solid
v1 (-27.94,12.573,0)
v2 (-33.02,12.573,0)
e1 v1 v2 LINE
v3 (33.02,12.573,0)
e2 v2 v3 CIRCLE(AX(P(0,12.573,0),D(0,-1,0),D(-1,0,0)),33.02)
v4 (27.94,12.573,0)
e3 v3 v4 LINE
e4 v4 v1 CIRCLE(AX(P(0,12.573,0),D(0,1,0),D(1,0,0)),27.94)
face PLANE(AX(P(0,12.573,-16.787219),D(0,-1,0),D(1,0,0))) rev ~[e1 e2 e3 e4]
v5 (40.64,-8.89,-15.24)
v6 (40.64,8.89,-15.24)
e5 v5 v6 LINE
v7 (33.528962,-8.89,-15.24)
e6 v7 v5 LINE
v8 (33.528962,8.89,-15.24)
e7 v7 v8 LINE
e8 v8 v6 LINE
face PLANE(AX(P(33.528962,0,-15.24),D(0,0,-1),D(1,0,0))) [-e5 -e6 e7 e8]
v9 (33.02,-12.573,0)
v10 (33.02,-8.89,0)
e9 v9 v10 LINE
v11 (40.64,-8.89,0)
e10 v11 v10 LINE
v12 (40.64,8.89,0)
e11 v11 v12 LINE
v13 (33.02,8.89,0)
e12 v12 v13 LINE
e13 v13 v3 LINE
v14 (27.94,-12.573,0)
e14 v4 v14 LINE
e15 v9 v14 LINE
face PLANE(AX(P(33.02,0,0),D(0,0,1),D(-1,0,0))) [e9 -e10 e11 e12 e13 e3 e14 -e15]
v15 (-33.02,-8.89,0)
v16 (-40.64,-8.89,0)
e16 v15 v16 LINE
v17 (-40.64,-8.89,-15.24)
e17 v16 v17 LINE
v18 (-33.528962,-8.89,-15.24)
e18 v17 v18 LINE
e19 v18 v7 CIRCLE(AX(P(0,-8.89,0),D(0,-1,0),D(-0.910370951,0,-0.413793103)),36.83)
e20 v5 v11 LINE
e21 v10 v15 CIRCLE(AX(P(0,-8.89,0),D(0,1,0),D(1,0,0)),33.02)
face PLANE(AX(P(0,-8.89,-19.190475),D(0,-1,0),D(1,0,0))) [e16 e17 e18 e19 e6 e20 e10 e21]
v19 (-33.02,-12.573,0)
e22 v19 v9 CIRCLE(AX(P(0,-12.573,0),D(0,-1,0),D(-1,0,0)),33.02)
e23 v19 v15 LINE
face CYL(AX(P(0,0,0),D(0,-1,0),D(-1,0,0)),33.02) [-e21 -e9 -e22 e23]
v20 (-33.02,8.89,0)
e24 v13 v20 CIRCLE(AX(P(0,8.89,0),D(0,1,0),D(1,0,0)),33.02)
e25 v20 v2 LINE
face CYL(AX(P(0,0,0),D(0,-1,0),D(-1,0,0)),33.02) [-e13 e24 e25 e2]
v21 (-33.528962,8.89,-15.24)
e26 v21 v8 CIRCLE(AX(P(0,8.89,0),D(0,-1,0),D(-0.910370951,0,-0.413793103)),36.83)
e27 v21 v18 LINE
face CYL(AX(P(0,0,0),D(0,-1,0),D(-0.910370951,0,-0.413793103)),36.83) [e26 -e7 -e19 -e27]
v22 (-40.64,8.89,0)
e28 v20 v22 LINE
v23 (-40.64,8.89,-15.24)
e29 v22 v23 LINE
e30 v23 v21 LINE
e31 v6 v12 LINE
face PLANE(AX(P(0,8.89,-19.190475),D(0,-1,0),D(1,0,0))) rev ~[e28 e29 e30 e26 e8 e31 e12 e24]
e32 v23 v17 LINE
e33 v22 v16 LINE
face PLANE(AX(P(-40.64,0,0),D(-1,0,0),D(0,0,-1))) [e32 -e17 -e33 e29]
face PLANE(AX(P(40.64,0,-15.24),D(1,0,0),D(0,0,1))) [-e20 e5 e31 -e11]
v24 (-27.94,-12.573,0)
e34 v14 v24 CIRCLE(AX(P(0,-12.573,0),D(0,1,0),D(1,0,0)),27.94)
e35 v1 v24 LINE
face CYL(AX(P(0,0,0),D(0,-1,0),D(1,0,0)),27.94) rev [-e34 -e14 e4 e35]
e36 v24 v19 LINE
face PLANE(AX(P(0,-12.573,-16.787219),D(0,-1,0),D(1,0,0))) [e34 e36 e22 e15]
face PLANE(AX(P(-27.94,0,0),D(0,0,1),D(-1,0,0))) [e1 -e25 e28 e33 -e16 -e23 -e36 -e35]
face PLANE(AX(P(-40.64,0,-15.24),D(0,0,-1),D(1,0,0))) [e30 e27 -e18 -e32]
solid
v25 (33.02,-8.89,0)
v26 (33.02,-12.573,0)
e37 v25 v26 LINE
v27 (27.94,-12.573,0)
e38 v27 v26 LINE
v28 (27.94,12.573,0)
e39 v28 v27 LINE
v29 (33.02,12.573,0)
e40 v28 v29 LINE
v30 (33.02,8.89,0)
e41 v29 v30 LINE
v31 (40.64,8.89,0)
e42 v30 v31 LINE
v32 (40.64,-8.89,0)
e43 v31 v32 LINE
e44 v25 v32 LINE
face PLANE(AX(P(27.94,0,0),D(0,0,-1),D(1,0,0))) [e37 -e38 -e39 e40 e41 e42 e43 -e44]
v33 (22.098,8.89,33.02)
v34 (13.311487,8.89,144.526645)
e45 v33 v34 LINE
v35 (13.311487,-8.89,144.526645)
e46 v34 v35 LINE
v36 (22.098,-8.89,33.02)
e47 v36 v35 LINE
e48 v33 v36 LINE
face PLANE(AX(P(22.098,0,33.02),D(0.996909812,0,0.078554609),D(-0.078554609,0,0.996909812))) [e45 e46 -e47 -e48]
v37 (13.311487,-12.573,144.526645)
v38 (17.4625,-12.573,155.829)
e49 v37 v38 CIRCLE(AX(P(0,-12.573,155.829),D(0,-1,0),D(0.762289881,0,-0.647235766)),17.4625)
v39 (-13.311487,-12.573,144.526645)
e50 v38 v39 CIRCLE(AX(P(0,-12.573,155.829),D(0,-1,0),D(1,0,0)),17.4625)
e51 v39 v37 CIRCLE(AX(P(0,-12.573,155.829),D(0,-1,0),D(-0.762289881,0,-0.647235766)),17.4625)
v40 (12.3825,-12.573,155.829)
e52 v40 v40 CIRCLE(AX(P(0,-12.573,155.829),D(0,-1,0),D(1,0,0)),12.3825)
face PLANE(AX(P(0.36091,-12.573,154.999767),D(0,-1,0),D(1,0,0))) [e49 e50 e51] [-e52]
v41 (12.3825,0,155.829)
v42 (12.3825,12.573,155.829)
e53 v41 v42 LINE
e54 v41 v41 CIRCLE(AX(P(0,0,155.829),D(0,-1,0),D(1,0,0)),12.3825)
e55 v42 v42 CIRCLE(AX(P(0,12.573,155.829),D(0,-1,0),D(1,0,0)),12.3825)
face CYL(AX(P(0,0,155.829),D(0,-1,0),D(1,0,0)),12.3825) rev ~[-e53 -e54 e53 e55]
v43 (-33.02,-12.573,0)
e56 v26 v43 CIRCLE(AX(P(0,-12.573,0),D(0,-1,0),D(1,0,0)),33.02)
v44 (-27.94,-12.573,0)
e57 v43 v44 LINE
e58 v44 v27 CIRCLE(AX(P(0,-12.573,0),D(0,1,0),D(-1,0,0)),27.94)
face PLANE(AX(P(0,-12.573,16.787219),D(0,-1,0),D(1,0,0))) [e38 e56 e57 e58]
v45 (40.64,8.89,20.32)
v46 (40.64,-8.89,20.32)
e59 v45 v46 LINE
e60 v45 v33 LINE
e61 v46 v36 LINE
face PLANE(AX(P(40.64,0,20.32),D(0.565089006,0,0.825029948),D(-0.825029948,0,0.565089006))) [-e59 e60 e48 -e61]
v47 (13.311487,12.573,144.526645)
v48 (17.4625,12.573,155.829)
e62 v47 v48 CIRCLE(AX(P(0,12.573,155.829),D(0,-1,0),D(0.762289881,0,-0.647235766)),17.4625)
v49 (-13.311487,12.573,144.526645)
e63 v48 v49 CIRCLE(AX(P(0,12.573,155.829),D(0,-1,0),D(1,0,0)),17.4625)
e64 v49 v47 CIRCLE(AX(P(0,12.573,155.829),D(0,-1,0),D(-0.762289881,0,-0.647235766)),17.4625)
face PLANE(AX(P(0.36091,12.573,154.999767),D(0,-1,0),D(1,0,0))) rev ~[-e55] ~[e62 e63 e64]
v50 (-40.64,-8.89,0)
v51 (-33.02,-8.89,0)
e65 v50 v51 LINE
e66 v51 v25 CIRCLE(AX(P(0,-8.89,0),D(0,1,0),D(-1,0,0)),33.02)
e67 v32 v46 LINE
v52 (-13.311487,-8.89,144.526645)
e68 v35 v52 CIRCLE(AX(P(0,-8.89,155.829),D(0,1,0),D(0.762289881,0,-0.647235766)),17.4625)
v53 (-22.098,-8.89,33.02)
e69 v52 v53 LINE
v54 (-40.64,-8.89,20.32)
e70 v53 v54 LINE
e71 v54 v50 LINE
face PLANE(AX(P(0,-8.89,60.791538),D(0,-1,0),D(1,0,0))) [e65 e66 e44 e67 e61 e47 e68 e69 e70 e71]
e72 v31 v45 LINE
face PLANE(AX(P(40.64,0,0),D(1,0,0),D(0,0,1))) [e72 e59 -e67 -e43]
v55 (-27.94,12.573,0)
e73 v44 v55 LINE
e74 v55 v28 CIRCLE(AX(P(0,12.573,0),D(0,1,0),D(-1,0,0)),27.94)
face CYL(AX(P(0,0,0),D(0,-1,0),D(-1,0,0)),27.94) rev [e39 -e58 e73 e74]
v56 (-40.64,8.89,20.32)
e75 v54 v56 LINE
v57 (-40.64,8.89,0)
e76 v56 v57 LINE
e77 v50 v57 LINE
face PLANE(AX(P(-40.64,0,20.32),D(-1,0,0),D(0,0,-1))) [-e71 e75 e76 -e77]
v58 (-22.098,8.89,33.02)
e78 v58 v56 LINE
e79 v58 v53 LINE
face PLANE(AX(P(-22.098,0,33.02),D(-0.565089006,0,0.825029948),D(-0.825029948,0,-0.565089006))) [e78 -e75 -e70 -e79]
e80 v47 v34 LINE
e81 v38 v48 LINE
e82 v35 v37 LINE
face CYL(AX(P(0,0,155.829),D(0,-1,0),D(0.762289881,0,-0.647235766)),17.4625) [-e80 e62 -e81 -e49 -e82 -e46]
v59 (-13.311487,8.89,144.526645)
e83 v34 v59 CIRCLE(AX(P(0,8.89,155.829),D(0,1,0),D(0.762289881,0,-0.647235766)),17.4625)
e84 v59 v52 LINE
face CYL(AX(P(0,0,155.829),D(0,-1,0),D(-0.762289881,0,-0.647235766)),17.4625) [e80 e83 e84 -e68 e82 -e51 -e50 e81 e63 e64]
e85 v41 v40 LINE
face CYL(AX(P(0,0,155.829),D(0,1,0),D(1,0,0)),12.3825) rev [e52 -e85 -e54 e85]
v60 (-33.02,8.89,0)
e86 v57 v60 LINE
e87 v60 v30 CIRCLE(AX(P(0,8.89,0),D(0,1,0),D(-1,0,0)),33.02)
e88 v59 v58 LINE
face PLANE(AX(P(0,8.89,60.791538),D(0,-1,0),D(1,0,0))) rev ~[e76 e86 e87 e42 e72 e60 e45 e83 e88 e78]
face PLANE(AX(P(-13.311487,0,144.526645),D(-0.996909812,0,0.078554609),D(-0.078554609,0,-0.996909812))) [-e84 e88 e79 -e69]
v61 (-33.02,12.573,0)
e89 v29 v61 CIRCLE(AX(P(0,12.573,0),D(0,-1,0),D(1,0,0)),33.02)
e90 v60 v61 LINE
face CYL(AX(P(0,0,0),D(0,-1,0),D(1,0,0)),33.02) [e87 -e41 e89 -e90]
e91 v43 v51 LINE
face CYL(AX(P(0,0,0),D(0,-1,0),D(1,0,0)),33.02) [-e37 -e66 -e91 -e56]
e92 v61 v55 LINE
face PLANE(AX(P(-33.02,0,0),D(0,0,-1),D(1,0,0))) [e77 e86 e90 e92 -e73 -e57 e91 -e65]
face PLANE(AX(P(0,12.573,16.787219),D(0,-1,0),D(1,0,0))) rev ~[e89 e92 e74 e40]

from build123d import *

# Parameters (mm, degrees)
F1_DEPTH = 12.573
F2_DEPTH = 8.89
F0_R     = 12.3825
F3_DEPTH = 12.573
F4_DEPTH = 12.573
F5_DEPTH = 8.89


with BuildPart() as f1:
    # F0 (on Front) → F1 (new body, symmetric)
    with BuildSketch(Plane.XZ):
        with BuildLine():
            ThreePointArc((-27.94, 0), (0, 27.94), (27.94, 0))
            Line((27.94, 0), (33.02, 0))
            ThreePointArc((33.02, 0), (0, 33.02), (-33.02, 0))
            Line((-33.02, 0), (-27.94, 0))
        make_face()
    extrude(amount=F1_DEPTH, both=True)

    # F0 (on Front) → F2 (join, symmetric)
    with BuildSketch(Plane.XZ):
        with BuildLine():
            ThreePointArc((-33.02, 0), (0, 33.02), (33.02, 0))
            Line((33.02, 0), (40.64, 0))
            Line((40.64, 0), (40.64, 20.32))
            Line((40.64, 20.32), (22.098, 33.02))
            Line((22.098, 33.02), (13.3114870458, 144.5266454276))
            ThreePointArc((13.3114870458, 144.5266454276), (0, 138.3665), (-13.3114870458, 144.5266454276))
            Line((-13.3114870458, 144.5266454276), (-22.098, 33.02))
            Line((-22.098, 33.02), (-40.64, 20.32))
            Line((-40.64, 20.32), (-40.64, 0))
            Line((-40.64, 0), (-33.02, 0))
        make_face()
    extrude(amount=F2_DEPTH, both=True)

    # F0 (on Front) → F3 (join, symmetric)
    with BuildSketch(Plane.XZ):
        with BuildLine():
            ThreePointArc((-13.3114870458, 144.5266454276), (0, 138.3665), (13.3114870458, 144.5266454276))
            ThreePointArc((13.3114870458, 144.5266454276), (16.3919301607, 149.8087398847), (17.4625, 155.829))
            ThreePointArc((17.4625, 155.829), (-6.0202601153, 172.2209301607), (-13.3114870458, 144.5266454276))
        make_face()
        with Locations((0, 155.829)):
            Circle(F0_R, mode=Mode.SUBTRACT)
    extrude(amount=F3_DEPTH, both=True)


with BuildPart() as f4:
    # F0 (on Front) → F4 (new body, symmetric)
    with BuildSketch(Plane.XZ):
        with BuildLine():
            Line((33.02, 0), (27.94, 0))
            ThreePointArc((27.94, 0), (0, -27.94), (-27.94, 0))
            Line((-27.94, 0), (-33.02, 0))
            ThreePointArc((-33.02, 0), (0, -33.02), (33.02, 0))
        make_face()
    extrude(amount=F4_DEPTH, both=True)

    # F0 (on Front) → F5 (join, symmetric)
    with BuildSketch(Plane.XZ):
        with BuildLine():
            Line((40.64, 0), (33.02, 0))
            ThreePointArc((33.02, 0), (0, -33.02), (-33.02, 0))
            Line((-33.02, 0), (-40.64, 0))
            Line((-40.64, 0), (-40.64, -15.24))
            Line((-40.64, -15.24), (-33.5289621074, -15.24))
            ThreePointArc((-33.5289621074, -15.24), (0, -36.83), (33.5289621074, -15.24))
            Line((33.5289621074, -15.24), (40.64, -15.24))
            Line((40.64, -15.24), (40.64, 0))
        make_face()
    extrude(amount=F5_DEPTH, both=True)


solid = Compound([f1.part, f4.part])
